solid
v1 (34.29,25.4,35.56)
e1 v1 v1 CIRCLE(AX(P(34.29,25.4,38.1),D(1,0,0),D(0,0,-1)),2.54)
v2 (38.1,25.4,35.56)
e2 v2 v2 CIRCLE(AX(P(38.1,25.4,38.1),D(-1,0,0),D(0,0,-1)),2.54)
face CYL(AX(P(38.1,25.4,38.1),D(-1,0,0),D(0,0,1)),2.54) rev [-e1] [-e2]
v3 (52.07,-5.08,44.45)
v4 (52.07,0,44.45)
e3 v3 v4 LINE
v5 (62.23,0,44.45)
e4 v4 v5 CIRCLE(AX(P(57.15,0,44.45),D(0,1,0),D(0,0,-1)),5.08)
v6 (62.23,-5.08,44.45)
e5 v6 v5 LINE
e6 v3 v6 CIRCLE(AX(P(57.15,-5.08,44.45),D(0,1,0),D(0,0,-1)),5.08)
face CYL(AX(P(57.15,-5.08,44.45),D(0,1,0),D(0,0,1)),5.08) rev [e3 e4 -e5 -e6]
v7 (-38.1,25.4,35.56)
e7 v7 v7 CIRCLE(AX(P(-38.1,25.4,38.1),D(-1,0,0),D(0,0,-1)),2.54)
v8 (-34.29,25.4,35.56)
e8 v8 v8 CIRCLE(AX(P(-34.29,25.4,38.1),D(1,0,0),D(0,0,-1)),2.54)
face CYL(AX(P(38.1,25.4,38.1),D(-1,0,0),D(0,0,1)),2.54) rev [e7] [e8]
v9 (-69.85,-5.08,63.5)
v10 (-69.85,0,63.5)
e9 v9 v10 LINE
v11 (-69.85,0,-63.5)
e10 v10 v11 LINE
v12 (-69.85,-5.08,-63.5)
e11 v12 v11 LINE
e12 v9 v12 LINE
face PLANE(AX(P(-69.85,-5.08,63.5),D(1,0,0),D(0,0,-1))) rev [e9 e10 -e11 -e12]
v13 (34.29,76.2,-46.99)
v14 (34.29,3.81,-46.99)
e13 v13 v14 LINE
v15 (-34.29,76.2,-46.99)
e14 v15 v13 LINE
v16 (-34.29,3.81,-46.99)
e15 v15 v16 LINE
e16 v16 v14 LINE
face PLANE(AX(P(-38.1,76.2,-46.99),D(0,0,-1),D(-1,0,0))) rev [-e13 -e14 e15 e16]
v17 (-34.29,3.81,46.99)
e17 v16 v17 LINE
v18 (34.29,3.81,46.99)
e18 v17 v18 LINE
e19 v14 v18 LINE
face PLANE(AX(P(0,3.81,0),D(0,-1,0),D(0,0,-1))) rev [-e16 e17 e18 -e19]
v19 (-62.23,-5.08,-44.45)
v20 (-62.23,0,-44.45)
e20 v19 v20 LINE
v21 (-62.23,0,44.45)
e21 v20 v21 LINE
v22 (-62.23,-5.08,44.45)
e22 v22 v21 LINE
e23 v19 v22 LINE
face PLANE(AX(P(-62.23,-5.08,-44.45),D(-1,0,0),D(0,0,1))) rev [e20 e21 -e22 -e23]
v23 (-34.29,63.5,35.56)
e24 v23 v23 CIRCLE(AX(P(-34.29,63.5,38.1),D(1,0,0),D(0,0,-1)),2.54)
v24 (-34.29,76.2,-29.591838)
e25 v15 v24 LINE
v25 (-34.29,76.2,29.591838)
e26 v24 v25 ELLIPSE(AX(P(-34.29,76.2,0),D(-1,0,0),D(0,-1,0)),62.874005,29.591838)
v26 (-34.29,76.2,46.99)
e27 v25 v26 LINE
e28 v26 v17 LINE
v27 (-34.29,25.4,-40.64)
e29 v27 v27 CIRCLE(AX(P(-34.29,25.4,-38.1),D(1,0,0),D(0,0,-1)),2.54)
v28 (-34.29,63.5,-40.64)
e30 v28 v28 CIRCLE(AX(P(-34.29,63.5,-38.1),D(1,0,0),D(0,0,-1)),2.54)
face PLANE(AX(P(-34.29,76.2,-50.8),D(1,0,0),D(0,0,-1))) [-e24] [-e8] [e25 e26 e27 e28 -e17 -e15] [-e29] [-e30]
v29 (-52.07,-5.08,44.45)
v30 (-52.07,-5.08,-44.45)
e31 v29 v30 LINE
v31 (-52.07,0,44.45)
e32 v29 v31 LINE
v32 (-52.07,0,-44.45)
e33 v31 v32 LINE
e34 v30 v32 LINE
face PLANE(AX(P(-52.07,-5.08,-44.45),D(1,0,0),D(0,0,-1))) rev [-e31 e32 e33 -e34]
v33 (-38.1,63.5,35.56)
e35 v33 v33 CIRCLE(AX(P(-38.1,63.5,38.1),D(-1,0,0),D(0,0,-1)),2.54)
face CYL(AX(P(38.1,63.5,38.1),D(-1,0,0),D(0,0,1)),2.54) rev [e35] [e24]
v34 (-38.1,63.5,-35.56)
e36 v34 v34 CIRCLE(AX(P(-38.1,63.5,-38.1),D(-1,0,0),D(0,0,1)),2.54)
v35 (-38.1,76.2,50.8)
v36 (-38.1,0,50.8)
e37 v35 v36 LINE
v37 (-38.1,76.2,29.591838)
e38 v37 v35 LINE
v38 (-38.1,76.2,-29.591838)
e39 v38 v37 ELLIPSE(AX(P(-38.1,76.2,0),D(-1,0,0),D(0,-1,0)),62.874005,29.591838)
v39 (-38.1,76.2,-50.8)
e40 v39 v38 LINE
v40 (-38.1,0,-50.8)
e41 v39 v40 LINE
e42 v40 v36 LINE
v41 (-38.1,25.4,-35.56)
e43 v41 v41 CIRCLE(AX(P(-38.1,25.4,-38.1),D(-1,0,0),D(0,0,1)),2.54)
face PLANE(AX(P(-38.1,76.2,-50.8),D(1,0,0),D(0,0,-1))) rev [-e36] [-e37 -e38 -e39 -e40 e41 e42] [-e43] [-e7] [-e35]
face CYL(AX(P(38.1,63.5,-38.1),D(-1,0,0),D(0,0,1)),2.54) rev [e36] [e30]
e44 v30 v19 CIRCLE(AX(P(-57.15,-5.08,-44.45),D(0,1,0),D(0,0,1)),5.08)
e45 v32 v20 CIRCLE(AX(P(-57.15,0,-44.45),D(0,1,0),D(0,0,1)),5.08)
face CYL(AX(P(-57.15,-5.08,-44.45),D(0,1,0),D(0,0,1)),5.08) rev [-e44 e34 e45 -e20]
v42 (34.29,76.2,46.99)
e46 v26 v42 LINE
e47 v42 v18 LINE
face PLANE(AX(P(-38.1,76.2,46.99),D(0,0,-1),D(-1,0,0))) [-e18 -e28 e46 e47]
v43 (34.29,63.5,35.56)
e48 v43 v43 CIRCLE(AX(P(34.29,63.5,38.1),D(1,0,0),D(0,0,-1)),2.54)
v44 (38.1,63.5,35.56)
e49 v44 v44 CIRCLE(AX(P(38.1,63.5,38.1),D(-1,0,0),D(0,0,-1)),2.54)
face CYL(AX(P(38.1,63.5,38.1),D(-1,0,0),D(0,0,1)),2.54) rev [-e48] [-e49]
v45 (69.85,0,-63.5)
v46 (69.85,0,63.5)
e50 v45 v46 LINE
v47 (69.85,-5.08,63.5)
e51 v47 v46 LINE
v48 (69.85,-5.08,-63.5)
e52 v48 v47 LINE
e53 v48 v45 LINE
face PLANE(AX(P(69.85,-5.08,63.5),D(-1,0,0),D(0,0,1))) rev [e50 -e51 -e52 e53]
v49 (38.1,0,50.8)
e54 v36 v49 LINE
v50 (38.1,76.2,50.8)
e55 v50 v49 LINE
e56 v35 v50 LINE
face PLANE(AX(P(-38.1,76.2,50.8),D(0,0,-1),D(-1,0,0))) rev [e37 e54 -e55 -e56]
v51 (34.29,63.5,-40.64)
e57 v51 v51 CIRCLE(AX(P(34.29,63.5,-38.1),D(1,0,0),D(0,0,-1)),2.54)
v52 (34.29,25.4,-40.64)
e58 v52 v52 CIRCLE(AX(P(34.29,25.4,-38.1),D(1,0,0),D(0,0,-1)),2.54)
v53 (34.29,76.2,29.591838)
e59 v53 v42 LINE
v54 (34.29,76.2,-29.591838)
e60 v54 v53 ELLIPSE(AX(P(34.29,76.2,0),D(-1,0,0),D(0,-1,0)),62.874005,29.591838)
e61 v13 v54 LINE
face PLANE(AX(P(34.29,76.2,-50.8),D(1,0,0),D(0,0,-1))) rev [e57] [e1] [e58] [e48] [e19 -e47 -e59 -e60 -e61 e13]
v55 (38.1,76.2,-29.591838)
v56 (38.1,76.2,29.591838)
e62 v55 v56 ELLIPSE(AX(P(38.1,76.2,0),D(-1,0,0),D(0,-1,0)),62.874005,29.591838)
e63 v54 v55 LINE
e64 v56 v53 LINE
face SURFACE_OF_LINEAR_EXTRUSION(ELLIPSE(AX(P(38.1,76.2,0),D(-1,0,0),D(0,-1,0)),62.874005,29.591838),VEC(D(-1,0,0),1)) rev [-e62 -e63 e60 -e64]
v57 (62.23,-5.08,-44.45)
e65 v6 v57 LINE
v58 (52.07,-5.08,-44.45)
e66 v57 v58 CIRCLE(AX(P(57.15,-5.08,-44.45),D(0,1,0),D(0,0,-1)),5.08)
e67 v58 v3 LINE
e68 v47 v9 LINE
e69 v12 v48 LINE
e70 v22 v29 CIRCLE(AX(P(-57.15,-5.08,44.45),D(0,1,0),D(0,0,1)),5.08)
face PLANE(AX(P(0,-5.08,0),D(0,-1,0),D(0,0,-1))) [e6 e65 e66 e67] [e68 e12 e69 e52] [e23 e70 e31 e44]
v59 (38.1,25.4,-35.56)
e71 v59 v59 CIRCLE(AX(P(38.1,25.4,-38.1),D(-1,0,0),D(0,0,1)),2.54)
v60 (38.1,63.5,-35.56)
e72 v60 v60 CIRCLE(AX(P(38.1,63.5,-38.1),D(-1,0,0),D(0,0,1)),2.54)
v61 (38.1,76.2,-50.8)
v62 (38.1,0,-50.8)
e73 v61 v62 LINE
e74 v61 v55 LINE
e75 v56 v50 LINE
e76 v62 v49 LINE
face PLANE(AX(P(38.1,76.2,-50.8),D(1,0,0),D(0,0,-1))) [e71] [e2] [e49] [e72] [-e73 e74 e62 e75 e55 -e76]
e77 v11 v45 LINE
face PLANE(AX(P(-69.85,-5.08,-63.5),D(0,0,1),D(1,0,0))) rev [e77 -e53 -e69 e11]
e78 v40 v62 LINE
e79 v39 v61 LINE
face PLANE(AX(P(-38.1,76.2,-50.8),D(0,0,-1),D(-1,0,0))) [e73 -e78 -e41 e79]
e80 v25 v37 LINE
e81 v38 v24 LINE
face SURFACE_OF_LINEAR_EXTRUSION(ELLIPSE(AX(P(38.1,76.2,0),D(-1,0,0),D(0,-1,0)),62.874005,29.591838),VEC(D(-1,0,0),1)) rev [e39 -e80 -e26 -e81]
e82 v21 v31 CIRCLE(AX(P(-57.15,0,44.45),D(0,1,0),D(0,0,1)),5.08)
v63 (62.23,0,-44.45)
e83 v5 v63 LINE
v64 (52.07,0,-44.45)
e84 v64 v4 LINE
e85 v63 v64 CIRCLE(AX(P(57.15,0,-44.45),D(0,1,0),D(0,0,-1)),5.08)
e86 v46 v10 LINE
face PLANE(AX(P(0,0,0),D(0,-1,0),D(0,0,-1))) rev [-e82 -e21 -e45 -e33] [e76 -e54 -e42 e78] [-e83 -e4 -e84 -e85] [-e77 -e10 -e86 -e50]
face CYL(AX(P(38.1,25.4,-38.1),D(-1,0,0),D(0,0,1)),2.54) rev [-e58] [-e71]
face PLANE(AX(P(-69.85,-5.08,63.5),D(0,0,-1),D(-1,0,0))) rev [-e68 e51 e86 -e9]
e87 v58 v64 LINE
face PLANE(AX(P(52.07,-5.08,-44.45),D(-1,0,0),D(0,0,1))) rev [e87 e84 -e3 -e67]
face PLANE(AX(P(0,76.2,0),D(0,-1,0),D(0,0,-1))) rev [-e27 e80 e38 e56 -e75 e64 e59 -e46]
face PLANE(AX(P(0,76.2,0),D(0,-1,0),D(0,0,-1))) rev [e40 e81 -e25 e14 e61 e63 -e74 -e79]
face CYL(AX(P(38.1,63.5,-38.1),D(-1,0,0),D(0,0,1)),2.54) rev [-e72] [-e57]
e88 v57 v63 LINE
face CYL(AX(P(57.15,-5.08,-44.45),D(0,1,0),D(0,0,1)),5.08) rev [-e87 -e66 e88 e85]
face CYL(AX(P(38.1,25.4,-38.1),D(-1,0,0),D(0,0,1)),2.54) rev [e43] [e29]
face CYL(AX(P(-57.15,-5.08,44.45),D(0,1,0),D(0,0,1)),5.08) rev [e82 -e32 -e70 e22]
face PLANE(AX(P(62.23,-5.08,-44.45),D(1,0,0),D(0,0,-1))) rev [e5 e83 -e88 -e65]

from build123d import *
from build123d.topology import SkipClean

# Parameters (mm, degrees)
SKETCH1_W           = 76.2
SKETCH1_H           = 101.6
BOSS_EXTRUDE1_DEPTH = 76.2
SKETCH2_RX          = 62.8740047
SKETCH2_RY          = 29.591838086
CUT_EXTRUDE1_DEPTH  = 120.1365603
SHELL1_T            = -3.81
SKETCH4_R           = 2.54
CUT_EXTRUDE2_DEPTH  = 120.13656047
SKETCH5_W           = 139.7
SKETCH5_H           = 127
BOSS_EXTRUDE2_DEPTH = 5.08
CUT_EXTRUDE3_DEPTH  = 122.316579721


with BuildPart() as part:
    # Sketch1 → Boss-Extrude1 (new body)
    with BuildSketch(Plane(origin=(0, 0, 0), x_dir=(1, 0, 0), z_dir=(0, 1, 0))):
        Rectangle(SKETCH1_W, SKETCH1_H)
    extrude(amount=BOSS_EXTRUDE1_DEPTH)

    # Sketch2 → Cut-Extrude1 (cut, through all)
    with SkipClean():  # the faces are left unmerged after this step: merging them gives an invalid solid
        with BuildSketch(Plane.ZY.offset(38.1)):
            with Locations(Location((0, 76.2), (0, 0, -90))):
                Ellipse(SKETCH2_RX, SKETCH2_RY)
        extrude(amount=-CUT_EXTRUDE1_DEPTH, mode=Mode.SUBTRACT)
    add(part.part.scale(1), mode=Mode.REPLACE)  # the faces are merged on a copy

    # Shell1
    shell1_openings = [part.faces().sort_by_distance(p)[0] for p in [
        (0, 76.2, -40.195919043),
        (0, 31.741364916, -20.924589378),
        (0, 31.741364916, 20.924589378),
        (0, 76.2, 40.195919043),
    ]]
    offset(amount=SHELL1_T, openings=shell1_openings, kind=Kind.INTERSECTION)

    # Sketch4 → Cut-Extrude2 (cut, through all)
    with BuildSketch(Plane.ZY.offset(38.1)):
        with Locations((-38.1, 63.5)):
            Circle(SKETCH4_R)
        with Locations((-38.1, 25.4)):
            Circle(SKETCH4_R)
        with Locations(Location((38.1, 25.4, 0), (0, 0, 180))):
            Circle(SKETCH4_R)
        with Locations(Location((38.1, 63.5, 0), (0, 0, 180))):
            Circle(SKETCH4_R)
    extrude(amount=-CUT_EXTRUDE2_DEPTH, mode=Mode.SUBTRACT)

    # Sketch5 → Boss-Extrude2 (add)
    with BuildSketch(Plane.XZ):
        Rectangle(SKETCH5_W, SKETCH5_H)
    extrude(amount=BOSS_EXTRUDE2_DEPTH)

    # Sketch6 → Cut-Extrude3 (cut, through all)
    with BuildSketch(Plane(origin=(0, 0, 0), x_dir=(1, 0, 0), z_dir=(0, 1, 0))):
        with BuildLine():
            Line((-52.07, 44.45), (-52.07, -44.45))
            ThreePointArc((-52.07, -44.45), (-57.15, -49.53), (-62.23, -44.45))
            Line((-62.23, -44.45), (-62.23, 44.45))
            ThreePointArc((-62.23, 44.45), (-57.15, 49.53), (-52.07, 44.45))
        make_face()
        with BuildLine():
            Line((52.07, 44.45), (52.07, -44.45))
            ThreePointArc((52.07, -44.45), (57.15, -49.53), (62.23, -44.45))
            Line((62.23, -44.45), (62.23, 44.45))
            ThreePointArc((62.23, 44.45), (57.15, 49.53), (52.07, 44.45))
        make_face()
    extrude(amount=-CUT_EXTRUDE3_DEPTH, mode=Mode.SUBTRACT)


solid = part.part
